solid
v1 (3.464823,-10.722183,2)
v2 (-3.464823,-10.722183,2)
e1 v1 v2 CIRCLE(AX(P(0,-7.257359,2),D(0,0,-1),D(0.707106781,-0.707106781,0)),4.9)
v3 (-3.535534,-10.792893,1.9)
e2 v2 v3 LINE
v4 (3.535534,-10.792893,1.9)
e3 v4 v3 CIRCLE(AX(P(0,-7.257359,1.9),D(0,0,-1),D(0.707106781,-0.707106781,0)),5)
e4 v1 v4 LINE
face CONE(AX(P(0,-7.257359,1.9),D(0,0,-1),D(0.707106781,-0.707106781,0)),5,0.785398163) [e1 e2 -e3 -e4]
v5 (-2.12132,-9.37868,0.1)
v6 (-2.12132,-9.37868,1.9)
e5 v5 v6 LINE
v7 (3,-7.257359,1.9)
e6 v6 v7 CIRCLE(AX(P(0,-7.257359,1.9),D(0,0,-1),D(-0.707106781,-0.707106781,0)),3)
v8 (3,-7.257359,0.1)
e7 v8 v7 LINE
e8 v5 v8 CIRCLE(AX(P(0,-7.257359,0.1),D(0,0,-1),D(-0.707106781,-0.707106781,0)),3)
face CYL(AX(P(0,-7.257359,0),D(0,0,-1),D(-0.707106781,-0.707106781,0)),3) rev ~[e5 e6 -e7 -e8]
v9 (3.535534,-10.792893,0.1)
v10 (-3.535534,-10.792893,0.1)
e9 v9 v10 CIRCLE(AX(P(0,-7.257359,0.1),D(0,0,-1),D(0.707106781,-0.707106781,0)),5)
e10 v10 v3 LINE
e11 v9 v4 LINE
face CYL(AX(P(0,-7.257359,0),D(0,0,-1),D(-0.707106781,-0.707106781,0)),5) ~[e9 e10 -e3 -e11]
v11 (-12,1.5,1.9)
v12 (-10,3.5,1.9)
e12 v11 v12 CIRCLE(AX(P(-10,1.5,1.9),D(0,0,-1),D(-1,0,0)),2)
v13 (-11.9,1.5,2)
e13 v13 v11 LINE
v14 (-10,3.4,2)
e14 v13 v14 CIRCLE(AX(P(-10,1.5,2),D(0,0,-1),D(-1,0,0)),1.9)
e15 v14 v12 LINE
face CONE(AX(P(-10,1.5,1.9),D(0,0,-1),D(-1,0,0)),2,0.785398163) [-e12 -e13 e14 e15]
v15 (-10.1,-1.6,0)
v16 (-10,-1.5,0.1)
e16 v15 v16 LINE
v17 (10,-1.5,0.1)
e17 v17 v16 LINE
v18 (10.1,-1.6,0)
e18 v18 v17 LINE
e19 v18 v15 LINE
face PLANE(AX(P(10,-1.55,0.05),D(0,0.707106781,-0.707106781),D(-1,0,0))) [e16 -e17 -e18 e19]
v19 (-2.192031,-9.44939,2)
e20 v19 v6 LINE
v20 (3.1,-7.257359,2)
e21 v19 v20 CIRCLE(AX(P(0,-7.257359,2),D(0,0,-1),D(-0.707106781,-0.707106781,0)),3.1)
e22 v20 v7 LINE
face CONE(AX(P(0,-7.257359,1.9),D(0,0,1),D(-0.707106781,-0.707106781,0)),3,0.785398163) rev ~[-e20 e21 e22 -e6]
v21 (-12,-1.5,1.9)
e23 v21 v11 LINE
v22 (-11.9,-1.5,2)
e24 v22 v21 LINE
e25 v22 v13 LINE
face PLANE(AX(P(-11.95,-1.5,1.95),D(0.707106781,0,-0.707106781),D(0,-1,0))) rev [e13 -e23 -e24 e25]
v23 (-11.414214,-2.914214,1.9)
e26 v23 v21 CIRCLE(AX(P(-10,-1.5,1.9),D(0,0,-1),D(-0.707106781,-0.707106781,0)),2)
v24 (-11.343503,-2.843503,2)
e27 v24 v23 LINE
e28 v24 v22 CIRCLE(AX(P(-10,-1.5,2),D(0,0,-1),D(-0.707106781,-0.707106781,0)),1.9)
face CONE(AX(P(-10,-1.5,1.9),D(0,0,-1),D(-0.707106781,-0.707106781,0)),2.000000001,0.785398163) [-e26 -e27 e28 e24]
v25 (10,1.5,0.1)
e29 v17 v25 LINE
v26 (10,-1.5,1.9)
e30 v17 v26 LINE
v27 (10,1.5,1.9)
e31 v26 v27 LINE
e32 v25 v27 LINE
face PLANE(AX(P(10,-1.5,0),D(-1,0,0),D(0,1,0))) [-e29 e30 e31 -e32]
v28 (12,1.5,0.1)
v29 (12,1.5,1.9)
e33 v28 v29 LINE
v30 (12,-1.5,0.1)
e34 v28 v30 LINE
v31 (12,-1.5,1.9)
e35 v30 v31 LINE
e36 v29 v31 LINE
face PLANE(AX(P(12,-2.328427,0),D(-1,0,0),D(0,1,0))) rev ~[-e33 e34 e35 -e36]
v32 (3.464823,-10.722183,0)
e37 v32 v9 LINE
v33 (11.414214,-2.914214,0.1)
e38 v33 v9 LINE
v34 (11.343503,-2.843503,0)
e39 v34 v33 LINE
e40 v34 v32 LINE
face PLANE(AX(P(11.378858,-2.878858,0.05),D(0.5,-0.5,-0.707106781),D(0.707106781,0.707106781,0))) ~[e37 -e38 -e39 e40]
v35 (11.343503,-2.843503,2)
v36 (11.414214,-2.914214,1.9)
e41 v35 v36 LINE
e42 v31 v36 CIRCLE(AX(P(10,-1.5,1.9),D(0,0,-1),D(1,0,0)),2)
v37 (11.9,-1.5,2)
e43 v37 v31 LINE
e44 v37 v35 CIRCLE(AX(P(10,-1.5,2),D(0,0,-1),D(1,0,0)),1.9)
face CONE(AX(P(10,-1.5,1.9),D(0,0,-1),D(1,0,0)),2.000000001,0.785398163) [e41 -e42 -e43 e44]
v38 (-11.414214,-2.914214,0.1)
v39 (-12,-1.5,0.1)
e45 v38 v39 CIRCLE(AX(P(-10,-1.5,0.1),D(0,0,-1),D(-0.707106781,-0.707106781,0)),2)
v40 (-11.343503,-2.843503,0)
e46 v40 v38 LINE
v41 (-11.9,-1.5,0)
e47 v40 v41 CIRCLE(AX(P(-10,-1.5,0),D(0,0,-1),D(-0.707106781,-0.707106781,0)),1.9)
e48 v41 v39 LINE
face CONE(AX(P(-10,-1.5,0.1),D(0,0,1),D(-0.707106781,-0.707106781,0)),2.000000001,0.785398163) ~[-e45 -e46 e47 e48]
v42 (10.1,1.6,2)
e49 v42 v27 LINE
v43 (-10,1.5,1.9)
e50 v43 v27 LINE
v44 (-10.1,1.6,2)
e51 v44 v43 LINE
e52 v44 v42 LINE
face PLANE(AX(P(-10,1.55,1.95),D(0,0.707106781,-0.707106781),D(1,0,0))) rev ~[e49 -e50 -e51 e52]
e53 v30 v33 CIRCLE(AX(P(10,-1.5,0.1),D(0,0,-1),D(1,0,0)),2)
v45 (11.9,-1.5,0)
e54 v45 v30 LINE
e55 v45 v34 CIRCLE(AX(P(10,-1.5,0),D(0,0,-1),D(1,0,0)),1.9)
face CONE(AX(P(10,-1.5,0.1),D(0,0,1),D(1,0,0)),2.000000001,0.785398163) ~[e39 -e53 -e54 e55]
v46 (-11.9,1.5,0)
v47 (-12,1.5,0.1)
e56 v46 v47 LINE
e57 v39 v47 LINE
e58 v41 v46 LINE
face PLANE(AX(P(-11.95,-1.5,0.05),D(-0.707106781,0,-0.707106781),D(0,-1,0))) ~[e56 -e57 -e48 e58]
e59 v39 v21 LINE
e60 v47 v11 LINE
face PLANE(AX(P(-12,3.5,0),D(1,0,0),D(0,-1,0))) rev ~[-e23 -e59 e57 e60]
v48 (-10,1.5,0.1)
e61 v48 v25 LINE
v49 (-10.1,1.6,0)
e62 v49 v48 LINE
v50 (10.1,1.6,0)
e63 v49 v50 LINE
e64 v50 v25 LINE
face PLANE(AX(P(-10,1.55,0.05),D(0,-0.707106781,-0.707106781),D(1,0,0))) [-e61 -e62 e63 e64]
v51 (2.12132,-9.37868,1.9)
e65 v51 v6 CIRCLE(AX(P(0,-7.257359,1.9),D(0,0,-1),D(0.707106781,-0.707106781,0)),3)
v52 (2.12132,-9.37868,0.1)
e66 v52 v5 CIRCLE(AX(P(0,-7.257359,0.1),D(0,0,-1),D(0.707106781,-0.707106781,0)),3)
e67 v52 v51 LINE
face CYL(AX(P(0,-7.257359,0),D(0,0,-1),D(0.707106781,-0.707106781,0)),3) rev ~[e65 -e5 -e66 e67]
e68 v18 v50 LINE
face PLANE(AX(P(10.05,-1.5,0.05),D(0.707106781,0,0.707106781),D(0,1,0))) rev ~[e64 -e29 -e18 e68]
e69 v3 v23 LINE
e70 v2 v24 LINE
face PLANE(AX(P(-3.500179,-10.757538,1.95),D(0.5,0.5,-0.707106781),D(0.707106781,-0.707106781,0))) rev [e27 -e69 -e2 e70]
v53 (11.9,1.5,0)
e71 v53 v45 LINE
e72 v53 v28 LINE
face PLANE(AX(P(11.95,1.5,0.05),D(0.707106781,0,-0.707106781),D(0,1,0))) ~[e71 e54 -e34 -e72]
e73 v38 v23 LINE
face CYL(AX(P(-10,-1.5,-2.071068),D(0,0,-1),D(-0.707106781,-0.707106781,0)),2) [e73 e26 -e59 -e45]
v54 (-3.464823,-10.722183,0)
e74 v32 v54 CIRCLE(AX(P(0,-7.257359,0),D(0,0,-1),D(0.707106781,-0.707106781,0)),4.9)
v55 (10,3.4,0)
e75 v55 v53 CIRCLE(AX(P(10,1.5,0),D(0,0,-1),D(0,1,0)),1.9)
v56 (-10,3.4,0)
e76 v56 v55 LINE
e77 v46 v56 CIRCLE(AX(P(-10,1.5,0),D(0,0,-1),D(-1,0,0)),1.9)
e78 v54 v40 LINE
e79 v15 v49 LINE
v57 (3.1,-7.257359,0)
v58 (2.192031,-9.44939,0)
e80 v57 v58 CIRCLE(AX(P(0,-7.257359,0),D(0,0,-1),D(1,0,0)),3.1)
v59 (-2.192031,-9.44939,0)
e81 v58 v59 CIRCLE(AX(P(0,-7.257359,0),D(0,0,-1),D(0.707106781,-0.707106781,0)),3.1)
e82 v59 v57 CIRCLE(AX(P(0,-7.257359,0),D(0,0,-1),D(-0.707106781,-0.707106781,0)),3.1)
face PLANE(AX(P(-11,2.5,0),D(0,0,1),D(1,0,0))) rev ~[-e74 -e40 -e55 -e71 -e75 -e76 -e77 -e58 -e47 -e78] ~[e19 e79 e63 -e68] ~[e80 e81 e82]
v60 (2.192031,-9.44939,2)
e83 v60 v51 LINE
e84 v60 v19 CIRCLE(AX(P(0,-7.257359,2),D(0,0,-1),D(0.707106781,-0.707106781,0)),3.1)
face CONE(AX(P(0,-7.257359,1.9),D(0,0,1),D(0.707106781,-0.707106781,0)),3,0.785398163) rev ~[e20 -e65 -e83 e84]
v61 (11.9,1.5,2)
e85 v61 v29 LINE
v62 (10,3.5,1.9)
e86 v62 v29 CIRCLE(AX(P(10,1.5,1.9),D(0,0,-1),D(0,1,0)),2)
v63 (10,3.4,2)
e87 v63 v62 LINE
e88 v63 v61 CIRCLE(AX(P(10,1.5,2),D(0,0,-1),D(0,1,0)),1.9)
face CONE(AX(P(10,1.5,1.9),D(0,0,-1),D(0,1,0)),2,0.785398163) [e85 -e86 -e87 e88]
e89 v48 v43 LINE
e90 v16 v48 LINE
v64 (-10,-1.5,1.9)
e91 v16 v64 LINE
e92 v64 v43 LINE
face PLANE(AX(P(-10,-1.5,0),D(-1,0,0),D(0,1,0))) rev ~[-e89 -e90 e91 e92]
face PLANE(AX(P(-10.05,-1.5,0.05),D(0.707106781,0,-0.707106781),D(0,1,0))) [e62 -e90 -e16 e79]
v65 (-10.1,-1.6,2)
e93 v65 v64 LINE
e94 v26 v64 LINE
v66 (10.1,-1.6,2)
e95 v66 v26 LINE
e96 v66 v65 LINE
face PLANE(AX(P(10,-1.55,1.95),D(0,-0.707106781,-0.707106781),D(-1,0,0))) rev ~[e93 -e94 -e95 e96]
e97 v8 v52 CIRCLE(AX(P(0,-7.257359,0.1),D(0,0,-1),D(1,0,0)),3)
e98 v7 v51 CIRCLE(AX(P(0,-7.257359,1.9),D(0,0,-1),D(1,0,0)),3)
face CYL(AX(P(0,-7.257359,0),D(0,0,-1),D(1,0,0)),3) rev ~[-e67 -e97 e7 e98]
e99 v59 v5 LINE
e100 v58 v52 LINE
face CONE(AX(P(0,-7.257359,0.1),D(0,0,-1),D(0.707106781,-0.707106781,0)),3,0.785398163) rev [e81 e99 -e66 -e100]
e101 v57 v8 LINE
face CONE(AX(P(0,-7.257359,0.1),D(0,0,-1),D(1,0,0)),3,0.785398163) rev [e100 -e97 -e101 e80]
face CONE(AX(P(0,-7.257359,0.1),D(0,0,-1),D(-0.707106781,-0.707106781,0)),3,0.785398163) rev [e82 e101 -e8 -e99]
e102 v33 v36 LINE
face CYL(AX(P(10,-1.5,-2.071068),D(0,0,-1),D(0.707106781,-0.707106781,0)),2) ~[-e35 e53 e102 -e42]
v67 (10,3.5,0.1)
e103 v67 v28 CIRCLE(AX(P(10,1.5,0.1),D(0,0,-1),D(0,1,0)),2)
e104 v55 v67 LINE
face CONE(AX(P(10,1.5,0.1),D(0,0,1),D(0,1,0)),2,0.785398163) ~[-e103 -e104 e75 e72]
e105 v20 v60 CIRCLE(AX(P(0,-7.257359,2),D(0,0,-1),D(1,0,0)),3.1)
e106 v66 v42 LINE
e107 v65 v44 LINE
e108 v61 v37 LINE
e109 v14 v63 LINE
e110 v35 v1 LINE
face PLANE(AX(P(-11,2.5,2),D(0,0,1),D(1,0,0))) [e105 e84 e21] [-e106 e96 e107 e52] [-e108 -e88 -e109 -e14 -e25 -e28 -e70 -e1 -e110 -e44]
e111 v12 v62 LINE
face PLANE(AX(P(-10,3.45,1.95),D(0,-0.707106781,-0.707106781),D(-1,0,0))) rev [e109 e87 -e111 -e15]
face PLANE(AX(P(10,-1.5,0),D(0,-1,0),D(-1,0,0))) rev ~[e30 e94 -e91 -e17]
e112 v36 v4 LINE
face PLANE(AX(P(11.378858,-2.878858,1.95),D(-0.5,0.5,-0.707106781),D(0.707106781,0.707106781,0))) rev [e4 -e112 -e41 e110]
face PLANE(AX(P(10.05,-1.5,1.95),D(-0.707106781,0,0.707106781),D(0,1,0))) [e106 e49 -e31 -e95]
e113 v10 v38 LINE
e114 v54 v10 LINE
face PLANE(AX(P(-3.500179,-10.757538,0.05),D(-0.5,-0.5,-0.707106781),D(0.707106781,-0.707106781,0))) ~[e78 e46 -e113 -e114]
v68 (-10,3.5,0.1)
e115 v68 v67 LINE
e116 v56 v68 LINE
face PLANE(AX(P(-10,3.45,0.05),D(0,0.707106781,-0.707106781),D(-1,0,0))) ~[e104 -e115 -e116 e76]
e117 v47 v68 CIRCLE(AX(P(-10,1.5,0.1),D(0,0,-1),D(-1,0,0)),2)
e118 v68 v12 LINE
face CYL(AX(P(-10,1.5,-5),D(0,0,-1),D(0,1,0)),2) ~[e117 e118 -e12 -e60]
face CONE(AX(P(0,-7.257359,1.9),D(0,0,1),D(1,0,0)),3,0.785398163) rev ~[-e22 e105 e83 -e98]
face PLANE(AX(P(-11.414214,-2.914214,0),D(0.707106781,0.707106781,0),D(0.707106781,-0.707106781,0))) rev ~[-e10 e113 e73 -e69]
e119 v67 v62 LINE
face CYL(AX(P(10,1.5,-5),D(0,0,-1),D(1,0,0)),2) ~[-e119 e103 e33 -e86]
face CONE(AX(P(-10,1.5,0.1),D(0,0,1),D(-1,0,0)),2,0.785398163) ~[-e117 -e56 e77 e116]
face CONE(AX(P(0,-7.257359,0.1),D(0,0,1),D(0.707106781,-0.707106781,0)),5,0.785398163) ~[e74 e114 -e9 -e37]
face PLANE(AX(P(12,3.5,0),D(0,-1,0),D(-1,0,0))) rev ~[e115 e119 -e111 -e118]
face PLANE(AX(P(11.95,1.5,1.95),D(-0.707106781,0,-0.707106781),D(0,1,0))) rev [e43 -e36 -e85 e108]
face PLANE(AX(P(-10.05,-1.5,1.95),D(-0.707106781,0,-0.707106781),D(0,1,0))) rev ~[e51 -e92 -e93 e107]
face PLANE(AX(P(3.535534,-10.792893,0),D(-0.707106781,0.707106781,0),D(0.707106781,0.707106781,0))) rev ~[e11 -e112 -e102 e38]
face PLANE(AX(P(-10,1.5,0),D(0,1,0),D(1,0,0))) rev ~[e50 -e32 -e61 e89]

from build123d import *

# Parameters (mm, degrees)
F0_W        = 2
F0_H        = 2
F0_W_2      = 20
F0_H_2      = 3
F1_DEPTH    = 2
F2_T1_DEPTH = 12
F2_T3_DEPTH = 6.1421356237
F3_SIZE     = 0.1


# Not quite as in the source:
# - a fillet or chamfer that OpenCascade refuses, or shapes differently, is made with other operations: its cross-section is extruded or revolved along the edge and cut away or added


with BuildPart() as f1:
    # F0 (on Top) → F1 (new body)
    with BuildSketch(Plane.XY):
        with Locations((-11, 2.5)):
            Rectangle(F0_W, F0_H)
        with Locations((0, 2.5)):
            Rectangle(F0_W_2, F0_H)
        with Locations((11, 2.5)):
            Rectangle(F0_W, F0_H)
        with Locations((11, 0)):
            Rectangle(F0_W, F0_H_2)
        Polygon((12, -1.5), (10, -1.5), (11.4142135624, -2.9142135624), (12, -2.3284271247), align=None)
        Polygon((11.4142135624, -2.9142135624), (10, -1.5), (2.1213203436, -9.3786796564), (3.5355339059, -10.7928932188), align=None)
        with BuildLine():
            ThreePointArc((2.1213203436, -9.3786796564), (0, -10.2573593129), (-2.1213203436, -9.3786796564))
            Line((-2.1213203436, -9.3786796564), (-3.5355339059, -10.7928932188))
            ThreePointArc((-3.5355339059, -10.7928932188), (0, -12.2573593129), (3.5355339059, -10.7928932188))
            Line((3.5355339059, -10.7928932188), (2.1213203436, -9.3786796564))
        make_face()
        Polygon((-2.1213203436, -9.3786796564), (-10, -1.5), (-11.4142135624, -2.9142135624), (-3.5355339059, -10.7928932188), align=None)
        Polygon((-11.4142135624, -2.9142135624), (-10, -1.5), (-12, -1.5), (-12, -2.3284271247), align=None)
        with Locations((-11, 0)):
            Rectangle(F0_W, F0_H_2)
        with BuildLine():
            Line((0, -1.5), (-10, -1.5))
            Line((-10, -1.5), (-2.1213203436, -9.3786796564))
            ThreePointArc((-2.1213203436, -9.3786796564), (-1.1480502971, -4.4857207153), (3, -7.2573593129))
            ThreePointArc((3, -7.2573593129), (2.7716385975, -8.40540961), (2.1213203436, -9.3786796564))
            Line((2.1213203436, -9.3786796564), (10, -1.5))
            Line((10, -1.5), (0, -1.5))
        make_face()
    extrude(amount=F1_DEPTH)

    # F2: fillet of radius 2 on 4 edges, made by hand

    # F2_s2 → F2_t1 (cut)
    with BuildSketch(Plane.XY.offset(-5)):
        with BuildLine():
            ThreePointArc((-10, 3.5), (-11.4142135624, 2.9142135624), (-12, 1.5))
            Line((-12, 1.5), (-12, 3.5))
            Line((-12, 3.5), (-10, 3.5))
        make_face()
        with BuildLine():
            ThreePointArc((12, 1.5), (11.4142135624, 2.9142135624), (10, 3.5))
            Line((10, 3.5), (12, 3.5))
            Line((12, 3.5), (12, 1.5))
        make_face()
    extrude(amount=F2_T1_DEPTH, mode=Mode.SUBTRACT)

    # F2_s4 → F2_t3 (cut)
    with BuildSketch(Plane.XY.offset(-2.0710678119)):
        with BuildLine():
            ThreePointArc((-11.4142135624, -2.9142135624), (-11.847759065, -2.2653668647), (-12, -1.5))
            Line((-12, -1.5), (-12, -2.3284271247))
            Line((-12, -2.3284271247), (-11.4142135624, -2.9142135624))
        make_face()
        with BuildLine():
            ThreePointArc((11.4142135624, -2.9142135624), (11.847759065, -2.2653668647), (12, -1.5))
            Line((12, -1.5), (12, -2.3284271247))
            Line((12, -2.3284271247), (11.4142135624, -2.9142135624))
        make_face()
    extrude(amount=F2_T3_DEPTH, mode=Mode.SUBTRACT)

    # F3
    f3_edges = [f1.edges().sort_by_distance(p)[0] for p in [
        (-11.414214, 2.914214, 2),
        (0, 3.5, 2),
        (11.414214, 2.914214, 2),
        (12, 0, 2),
        (11.847759, -2.265367, 2),
        (7.474874, -6.853553, 2),
        (0, -12.257359, 2),
        (-7.474874, -6.853553, 2),
        (-11.847759, -2.265367, 2),
        (-12, 0, 2),
        (2.12132, -5.136039, 2),
        (0, 1.5, 2),
        (-10, 0, 2),
        (10, 0, 2),
        (0, -1.5, 2),
        (-11.414214, 2.914214, 0),
        (0, 3.5, 0),
        (11.414214, 2.914214, 0),
        (12, 0, 0),
        (11.847759, -2.265367, 0),
        (7.474874, -6.853553, 0),
        (0, -12.257359, 0),
        (-7.474874, -6.853553, 0),
        (-11.847759, -2.265367, 0),
        (-12, 0, 0),
        (2.12132, -5.136039, 0),
        (0, 1.5, 0),
        (-10, 0, 0),
        (10, 0, 0),
        (0, -1.5, 0),
    ]]
    chamfer(f3_edges, length=F3_SIZE)


solid = f1.part
